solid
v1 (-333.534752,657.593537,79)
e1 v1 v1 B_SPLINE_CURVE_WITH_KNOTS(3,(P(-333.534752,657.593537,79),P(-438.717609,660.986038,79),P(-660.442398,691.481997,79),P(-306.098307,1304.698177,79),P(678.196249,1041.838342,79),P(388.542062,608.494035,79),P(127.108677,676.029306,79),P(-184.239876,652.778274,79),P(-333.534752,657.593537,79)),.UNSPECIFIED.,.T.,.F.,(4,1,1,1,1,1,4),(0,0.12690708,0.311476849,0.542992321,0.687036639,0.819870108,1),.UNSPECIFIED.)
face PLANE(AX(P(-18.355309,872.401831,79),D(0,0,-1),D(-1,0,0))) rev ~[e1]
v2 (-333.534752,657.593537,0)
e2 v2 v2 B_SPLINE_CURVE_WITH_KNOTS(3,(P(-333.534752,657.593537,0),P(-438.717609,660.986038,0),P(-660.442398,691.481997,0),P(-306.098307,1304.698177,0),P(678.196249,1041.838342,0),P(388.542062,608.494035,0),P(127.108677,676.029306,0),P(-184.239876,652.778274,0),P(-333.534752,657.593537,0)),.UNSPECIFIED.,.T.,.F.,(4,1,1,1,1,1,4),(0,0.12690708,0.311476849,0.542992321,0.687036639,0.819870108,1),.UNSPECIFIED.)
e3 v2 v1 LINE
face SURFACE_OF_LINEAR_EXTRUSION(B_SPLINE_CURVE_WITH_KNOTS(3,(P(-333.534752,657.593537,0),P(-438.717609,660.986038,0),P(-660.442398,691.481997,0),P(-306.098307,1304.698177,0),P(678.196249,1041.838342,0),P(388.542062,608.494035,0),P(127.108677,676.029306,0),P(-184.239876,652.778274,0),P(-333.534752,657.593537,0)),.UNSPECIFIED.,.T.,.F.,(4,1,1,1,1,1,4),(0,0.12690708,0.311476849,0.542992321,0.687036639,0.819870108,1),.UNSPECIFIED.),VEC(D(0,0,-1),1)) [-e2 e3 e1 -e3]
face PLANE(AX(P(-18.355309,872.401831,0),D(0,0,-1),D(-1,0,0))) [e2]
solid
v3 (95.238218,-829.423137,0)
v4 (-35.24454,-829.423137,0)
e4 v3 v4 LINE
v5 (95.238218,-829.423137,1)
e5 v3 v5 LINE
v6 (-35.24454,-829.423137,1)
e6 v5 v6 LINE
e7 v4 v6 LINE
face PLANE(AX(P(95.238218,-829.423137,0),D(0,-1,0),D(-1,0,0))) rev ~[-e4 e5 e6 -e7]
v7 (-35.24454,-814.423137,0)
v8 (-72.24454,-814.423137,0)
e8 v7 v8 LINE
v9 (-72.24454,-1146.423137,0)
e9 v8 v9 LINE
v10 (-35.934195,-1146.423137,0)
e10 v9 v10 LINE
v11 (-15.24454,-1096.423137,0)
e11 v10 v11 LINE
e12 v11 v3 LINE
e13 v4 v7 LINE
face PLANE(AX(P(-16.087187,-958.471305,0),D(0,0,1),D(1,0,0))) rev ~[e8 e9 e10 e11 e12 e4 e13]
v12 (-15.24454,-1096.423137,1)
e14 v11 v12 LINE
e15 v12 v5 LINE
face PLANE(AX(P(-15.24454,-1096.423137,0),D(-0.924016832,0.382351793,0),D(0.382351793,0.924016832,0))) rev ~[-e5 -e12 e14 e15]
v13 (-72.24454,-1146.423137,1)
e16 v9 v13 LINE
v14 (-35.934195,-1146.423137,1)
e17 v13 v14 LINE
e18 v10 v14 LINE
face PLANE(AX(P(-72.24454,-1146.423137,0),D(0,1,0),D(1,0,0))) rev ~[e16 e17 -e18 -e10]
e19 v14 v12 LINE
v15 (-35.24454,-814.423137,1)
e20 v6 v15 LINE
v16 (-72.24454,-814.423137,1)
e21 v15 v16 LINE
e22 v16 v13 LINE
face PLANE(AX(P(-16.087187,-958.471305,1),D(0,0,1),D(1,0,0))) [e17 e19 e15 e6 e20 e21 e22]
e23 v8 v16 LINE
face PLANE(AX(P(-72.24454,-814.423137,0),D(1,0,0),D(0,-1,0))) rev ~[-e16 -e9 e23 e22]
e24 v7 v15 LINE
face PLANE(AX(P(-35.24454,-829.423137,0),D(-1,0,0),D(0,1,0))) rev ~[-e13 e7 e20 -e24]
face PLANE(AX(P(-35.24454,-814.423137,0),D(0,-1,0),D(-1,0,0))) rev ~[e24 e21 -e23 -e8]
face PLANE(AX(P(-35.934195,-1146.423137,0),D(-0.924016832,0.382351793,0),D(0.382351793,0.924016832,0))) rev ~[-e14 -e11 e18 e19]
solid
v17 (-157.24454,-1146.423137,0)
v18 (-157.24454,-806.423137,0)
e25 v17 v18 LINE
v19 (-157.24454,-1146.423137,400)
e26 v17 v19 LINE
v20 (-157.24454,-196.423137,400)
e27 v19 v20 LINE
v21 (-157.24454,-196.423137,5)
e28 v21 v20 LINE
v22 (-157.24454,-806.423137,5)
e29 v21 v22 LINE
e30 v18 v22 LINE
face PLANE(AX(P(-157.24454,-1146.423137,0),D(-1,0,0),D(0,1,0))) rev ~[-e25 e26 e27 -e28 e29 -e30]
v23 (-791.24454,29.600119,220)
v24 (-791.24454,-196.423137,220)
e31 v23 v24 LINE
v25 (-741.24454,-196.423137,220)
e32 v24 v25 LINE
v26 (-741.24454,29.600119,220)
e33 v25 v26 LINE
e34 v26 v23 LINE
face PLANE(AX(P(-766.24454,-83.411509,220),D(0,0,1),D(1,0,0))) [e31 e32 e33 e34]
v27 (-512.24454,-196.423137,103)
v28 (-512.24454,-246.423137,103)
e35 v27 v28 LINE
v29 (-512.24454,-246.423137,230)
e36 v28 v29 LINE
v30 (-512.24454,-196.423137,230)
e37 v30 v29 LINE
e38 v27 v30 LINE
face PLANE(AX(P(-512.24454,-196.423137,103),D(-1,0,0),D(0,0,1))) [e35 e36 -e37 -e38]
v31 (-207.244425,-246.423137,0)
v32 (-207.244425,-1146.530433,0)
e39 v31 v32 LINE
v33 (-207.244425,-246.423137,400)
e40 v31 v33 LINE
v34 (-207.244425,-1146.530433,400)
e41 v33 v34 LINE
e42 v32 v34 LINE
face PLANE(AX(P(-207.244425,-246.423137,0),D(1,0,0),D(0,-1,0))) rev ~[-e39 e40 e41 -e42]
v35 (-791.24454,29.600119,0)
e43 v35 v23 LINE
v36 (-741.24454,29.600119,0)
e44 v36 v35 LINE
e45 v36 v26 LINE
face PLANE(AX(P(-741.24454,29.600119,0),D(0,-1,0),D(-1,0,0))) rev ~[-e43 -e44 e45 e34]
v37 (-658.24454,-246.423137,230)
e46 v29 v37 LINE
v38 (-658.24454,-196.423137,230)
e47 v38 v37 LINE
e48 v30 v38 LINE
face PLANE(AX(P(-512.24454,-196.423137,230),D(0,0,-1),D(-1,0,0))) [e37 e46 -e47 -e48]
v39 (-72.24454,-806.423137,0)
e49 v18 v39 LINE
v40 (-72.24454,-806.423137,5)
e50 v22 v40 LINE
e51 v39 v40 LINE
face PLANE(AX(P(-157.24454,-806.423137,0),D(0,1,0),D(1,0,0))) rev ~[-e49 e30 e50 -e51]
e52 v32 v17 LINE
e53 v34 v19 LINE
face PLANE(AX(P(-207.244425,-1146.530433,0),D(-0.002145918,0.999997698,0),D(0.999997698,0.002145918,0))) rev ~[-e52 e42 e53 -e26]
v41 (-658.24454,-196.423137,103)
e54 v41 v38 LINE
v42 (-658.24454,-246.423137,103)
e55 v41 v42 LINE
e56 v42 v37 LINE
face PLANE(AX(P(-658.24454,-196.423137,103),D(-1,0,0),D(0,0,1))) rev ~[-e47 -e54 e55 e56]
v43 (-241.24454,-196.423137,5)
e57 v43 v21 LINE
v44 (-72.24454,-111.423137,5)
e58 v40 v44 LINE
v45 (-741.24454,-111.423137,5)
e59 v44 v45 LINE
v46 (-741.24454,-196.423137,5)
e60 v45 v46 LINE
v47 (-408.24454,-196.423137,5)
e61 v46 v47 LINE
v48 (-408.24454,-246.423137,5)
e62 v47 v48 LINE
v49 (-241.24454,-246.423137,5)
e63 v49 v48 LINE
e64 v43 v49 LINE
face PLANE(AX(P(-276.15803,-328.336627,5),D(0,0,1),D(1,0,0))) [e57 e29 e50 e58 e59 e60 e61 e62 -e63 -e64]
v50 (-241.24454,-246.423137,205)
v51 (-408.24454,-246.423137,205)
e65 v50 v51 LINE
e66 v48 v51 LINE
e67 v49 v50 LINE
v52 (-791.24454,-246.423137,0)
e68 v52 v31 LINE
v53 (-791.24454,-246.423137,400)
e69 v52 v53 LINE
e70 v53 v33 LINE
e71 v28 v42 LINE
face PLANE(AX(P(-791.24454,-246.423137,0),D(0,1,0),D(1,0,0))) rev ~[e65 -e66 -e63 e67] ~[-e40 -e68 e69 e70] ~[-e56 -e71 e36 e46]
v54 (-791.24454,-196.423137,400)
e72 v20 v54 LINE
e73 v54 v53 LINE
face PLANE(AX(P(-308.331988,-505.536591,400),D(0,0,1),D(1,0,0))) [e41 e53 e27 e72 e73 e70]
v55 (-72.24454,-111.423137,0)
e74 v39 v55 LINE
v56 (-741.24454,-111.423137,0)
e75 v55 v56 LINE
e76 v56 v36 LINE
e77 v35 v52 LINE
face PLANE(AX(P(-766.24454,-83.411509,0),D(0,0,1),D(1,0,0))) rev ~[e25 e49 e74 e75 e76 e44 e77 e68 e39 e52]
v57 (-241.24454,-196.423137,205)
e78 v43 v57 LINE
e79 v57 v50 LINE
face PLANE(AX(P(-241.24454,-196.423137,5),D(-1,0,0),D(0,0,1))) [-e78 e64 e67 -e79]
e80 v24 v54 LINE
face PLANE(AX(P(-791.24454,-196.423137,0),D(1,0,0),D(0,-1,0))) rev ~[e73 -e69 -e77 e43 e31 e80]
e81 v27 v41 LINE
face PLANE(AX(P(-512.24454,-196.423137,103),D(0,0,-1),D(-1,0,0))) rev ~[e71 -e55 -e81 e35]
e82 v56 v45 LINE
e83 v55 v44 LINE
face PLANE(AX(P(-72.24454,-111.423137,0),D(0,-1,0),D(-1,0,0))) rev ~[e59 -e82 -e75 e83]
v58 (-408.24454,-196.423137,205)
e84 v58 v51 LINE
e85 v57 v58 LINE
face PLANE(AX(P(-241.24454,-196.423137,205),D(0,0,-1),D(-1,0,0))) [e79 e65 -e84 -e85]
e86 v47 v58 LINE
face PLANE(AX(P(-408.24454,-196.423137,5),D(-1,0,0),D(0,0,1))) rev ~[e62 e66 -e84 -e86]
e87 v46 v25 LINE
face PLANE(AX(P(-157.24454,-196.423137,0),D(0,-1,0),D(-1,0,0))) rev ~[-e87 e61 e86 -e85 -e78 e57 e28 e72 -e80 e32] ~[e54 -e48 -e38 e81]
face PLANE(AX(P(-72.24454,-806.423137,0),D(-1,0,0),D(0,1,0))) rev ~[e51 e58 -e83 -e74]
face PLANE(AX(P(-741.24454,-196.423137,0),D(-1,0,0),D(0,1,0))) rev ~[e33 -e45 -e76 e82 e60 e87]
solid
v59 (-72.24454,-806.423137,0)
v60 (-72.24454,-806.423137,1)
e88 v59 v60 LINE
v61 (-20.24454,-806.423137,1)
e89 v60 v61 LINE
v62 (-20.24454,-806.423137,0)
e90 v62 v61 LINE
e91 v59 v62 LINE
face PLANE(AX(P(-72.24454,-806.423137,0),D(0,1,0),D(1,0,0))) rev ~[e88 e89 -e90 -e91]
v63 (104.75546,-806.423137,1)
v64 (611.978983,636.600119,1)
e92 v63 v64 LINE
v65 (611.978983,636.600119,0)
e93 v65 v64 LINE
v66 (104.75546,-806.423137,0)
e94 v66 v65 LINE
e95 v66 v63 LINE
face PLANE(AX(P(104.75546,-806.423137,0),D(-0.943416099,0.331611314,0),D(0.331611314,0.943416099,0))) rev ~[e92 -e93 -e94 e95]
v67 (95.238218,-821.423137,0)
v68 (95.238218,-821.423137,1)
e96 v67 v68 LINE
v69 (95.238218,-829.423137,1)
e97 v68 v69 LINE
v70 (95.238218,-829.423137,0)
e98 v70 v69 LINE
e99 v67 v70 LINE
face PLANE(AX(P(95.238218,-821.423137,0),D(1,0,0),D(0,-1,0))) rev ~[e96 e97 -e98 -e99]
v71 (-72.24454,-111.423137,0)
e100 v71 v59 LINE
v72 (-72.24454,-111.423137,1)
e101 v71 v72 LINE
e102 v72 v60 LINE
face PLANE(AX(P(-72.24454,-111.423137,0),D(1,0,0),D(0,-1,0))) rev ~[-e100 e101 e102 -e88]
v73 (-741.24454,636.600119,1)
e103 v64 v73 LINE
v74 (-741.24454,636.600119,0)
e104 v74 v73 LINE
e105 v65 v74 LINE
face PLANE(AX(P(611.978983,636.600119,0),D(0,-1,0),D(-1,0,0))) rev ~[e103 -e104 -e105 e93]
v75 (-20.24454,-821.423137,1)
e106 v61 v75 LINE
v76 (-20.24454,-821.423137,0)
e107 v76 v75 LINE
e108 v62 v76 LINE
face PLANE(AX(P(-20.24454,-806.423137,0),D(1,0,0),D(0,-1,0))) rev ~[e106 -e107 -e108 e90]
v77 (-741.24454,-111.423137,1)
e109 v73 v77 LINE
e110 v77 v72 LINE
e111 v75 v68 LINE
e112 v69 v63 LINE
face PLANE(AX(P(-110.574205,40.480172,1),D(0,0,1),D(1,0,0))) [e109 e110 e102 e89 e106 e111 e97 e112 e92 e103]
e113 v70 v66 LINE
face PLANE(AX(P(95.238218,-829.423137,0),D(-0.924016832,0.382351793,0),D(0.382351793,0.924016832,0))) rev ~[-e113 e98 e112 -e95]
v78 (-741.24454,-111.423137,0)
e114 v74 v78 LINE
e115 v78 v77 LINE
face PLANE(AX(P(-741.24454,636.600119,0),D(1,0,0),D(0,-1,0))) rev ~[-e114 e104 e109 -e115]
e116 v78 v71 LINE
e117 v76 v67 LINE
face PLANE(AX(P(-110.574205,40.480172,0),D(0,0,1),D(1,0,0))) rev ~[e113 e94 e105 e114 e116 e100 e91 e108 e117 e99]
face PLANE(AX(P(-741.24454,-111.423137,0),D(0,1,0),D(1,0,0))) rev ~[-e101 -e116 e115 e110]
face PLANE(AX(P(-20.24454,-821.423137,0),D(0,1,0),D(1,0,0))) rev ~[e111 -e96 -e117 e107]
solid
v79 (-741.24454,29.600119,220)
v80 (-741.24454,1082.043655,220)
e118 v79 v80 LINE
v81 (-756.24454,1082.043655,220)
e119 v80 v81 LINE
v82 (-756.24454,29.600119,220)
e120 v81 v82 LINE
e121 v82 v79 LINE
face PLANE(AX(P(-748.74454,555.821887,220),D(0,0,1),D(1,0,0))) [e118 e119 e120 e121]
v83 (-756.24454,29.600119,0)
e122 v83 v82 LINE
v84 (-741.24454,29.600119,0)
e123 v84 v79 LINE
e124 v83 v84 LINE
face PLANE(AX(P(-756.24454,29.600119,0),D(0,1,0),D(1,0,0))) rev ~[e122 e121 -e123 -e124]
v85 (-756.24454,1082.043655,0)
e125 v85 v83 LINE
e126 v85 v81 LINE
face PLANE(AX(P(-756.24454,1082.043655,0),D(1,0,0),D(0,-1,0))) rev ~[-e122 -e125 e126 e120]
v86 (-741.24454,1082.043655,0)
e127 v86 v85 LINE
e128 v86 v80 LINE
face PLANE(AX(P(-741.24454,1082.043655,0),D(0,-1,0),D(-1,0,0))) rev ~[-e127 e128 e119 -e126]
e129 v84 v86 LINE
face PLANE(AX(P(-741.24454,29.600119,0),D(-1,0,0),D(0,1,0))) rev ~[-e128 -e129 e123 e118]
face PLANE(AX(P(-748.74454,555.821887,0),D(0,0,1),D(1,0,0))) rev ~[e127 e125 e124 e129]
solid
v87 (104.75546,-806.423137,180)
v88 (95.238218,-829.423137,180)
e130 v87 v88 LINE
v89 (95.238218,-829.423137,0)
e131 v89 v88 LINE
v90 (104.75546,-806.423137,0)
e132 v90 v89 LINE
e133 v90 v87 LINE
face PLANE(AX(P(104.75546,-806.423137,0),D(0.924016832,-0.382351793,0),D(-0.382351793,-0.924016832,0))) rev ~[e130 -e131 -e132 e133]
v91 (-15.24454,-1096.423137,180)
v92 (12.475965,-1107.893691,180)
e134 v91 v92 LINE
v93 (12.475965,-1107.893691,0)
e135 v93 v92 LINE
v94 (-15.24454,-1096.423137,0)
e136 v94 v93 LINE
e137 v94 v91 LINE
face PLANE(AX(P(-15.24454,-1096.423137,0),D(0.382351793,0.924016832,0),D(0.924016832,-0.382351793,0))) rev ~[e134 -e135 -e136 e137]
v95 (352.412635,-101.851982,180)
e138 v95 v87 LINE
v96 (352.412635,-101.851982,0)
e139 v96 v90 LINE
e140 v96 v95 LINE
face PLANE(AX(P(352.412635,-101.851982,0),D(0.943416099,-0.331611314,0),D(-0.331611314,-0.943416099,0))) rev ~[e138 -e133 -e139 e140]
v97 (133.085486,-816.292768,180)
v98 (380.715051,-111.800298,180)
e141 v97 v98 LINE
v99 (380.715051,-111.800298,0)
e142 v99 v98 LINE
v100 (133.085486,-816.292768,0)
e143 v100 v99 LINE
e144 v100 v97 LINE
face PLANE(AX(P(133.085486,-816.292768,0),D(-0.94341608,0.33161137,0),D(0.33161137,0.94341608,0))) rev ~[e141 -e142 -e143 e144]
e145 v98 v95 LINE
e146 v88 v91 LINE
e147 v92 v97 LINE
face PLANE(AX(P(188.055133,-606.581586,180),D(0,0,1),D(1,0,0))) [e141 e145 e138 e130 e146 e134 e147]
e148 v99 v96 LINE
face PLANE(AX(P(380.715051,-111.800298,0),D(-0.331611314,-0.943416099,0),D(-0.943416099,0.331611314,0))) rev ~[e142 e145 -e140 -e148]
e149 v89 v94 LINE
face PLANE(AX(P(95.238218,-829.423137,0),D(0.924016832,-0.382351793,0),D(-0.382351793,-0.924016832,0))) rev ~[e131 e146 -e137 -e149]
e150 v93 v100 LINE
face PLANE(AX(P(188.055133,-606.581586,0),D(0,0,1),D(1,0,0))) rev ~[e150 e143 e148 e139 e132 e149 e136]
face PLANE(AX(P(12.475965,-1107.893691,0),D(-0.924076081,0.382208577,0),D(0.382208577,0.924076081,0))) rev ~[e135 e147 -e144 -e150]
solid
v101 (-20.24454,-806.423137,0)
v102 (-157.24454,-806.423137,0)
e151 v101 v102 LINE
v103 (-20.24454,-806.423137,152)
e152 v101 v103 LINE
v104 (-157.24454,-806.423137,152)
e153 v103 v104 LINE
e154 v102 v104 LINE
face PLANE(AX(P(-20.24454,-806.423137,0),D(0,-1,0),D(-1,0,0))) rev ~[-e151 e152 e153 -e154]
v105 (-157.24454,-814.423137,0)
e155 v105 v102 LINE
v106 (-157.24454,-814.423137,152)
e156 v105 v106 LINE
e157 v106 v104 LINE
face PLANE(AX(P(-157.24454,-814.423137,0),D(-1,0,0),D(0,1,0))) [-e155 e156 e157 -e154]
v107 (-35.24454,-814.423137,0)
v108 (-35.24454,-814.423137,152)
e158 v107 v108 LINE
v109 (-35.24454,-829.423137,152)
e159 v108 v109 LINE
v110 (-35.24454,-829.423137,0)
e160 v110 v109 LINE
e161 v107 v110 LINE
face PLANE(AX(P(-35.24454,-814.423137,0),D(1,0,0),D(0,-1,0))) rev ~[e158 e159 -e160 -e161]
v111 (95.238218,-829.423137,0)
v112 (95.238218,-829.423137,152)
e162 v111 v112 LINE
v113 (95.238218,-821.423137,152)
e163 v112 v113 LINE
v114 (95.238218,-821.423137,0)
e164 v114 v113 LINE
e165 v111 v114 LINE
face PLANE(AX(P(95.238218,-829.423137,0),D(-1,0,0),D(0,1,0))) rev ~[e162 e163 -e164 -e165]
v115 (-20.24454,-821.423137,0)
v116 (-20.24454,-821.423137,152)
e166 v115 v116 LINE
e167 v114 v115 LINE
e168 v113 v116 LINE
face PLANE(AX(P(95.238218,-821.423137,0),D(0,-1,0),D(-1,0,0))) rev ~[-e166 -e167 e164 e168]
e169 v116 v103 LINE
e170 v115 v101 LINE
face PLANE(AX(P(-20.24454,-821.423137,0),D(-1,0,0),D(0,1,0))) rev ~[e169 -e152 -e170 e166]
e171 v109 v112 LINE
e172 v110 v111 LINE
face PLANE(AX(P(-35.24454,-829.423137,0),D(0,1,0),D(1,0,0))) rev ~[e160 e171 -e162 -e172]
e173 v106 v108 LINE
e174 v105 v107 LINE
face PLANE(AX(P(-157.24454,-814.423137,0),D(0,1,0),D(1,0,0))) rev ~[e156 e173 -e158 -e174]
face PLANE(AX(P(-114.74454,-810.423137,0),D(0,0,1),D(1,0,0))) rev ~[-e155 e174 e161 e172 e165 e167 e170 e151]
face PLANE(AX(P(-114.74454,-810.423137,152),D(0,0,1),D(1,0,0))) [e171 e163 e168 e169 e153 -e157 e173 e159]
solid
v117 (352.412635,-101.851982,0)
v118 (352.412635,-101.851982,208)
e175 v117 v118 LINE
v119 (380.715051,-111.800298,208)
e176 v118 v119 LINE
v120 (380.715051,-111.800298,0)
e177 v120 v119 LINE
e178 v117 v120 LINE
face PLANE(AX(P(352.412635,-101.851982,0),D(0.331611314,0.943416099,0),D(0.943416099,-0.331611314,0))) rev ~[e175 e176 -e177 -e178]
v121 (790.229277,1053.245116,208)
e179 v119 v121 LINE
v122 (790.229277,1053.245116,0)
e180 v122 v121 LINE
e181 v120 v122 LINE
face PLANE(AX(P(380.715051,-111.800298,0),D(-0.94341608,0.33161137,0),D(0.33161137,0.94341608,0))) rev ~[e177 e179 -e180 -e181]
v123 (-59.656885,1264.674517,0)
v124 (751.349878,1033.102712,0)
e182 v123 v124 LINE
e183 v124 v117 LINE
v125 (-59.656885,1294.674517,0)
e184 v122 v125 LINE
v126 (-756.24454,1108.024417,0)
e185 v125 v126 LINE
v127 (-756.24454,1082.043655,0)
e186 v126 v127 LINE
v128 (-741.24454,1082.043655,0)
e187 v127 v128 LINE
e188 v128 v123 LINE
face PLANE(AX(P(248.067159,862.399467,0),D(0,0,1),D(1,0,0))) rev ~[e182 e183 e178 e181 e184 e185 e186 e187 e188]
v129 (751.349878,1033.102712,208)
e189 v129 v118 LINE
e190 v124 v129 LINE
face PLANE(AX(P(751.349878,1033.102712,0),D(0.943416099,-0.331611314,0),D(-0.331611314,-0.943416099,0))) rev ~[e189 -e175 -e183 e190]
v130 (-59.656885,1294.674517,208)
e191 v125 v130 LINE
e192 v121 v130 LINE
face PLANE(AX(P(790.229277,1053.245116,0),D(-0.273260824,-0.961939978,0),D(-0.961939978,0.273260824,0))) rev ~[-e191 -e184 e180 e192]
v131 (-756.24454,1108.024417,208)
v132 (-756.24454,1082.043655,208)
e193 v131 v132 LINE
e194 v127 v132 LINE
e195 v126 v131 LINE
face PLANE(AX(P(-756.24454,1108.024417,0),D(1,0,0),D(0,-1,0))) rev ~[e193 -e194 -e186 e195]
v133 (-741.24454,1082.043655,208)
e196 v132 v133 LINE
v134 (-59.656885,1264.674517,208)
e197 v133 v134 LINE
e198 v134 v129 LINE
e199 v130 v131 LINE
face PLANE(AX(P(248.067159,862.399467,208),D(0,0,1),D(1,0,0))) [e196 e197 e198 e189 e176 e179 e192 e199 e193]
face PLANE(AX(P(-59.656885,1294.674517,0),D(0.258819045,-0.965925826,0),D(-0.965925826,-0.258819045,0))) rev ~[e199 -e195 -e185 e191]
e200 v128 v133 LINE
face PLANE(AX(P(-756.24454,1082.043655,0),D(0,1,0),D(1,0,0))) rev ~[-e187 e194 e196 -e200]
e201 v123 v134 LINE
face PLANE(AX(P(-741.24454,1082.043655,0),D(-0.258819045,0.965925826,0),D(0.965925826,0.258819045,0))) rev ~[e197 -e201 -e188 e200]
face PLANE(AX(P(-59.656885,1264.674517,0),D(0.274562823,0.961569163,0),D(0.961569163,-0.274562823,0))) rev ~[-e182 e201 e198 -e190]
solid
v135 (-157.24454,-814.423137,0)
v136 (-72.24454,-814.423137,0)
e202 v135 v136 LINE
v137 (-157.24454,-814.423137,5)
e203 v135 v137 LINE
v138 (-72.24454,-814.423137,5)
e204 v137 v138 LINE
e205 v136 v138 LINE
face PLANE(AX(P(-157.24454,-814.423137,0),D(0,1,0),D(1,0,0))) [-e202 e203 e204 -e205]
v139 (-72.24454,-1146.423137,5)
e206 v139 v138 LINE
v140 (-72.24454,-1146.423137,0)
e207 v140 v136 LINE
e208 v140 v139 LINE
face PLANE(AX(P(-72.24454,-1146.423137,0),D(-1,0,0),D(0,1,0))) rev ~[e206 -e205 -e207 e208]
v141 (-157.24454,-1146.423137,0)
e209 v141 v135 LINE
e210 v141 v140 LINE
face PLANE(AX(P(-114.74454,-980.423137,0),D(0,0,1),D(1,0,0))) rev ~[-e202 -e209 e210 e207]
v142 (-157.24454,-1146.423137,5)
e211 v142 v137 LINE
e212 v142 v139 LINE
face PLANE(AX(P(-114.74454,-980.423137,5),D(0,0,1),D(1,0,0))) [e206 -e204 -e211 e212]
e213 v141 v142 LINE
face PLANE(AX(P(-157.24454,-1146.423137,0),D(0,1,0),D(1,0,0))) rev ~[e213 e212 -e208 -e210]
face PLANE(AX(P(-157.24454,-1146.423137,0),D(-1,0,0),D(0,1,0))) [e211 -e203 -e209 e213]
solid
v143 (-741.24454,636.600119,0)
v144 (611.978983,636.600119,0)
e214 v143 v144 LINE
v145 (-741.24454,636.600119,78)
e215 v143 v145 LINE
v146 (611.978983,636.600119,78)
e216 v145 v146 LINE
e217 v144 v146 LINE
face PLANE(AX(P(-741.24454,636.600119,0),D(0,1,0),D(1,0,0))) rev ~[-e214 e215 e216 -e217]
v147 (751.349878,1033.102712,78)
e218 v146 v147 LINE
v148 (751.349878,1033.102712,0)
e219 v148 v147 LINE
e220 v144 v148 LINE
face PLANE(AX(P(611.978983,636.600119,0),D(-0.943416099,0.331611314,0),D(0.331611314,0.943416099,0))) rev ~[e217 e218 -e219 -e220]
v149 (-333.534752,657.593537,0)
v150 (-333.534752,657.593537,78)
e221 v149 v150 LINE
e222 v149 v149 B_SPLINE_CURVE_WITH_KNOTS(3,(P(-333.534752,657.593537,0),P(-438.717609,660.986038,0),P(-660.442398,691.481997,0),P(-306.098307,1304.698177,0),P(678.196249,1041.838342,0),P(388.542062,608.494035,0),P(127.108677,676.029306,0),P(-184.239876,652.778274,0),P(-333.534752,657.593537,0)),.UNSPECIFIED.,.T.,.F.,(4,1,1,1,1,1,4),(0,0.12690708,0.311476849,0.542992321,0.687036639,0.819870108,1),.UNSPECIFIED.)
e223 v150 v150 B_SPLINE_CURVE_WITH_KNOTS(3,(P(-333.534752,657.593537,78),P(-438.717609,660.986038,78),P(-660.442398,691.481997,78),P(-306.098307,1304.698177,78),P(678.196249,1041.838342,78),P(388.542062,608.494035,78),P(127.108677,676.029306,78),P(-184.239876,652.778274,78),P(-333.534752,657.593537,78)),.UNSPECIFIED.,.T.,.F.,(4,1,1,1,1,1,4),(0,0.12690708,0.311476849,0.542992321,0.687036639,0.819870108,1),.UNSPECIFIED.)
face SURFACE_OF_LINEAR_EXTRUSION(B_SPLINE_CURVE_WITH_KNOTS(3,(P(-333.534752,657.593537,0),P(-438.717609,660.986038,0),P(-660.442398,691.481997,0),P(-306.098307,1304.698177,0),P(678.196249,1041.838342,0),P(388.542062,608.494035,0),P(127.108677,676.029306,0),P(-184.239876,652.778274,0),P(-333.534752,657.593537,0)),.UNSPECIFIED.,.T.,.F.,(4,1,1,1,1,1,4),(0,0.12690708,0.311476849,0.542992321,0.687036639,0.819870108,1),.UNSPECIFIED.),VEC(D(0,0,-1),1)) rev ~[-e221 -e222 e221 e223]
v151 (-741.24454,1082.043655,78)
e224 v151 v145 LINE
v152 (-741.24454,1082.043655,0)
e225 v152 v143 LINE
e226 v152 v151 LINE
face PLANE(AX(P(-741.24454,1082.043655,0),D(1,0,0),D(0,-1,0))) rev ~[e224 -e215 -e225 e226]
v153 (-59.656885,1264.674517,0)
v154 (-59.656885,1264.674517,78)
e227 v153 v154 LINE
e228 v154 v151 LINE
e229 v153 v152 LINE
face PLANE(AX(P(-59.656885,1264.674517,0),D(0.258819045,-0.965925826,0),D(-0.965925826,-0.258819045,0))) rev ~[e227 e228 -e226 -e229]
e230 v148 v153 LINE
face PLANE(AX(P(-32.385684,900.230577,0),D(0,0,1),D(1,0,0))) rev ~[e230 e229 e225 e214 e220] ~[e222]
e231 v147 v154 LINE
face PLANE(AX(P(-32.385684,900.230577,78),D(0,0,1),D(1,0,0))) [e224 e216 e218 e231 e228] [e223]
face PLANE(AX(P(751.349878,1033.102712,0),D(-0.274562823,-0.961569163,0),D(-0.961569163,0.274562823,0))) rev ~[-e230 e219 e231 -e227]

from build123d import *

# Parameters (mm, degrees)
F1_DEPTH  = 78
F2_DEPTH  = 5
F0_W      = 85
F0_H      = 332
F3_DEPTH  = 220
F4_DEPTH  = 220
F5_DEPTH  = 400
F6_W      = 167
F6_H      = 200
F6_W_2    = 146
F6_H_2    = 127
F7_DEPTH  = 200
F8_DEPTH  = 208
F9_DEPTH  = 180
F0_H_2    = 8
F0_W_2    = 37
F10_DEPTH = 152
F11_DEPTH = 79
F12_DEPTH = 1
F13_DEPTH = 1


# Not quite as in the source:
# - a feature names something its author has since deleted; it is built from what else it names


with BuildPart() as f1:
    # F0 (on Top) → F1 (new body)
    with BuildSketch(Plane.XY):
        Polygon((-741.2445402145, 1082.0436550353), (-741.2445402145, 636.6001187265), (85.7554597855, 636.6001187265), (611.9789830182, 636.6001187265), (751.3498777895, 1033.1027120147), (-59.6568852941, 1264.6745167422), align=None)
        with BuildLine():
            add(Edge.make_bspline(
                [(-333.5347517591, 657.5935368718), (-438.7176092773, 660.9860382691), (-660.4423976157, 691.4819966509), (-306.0983067038, 1304.6981771282), (678.1962489209, 1041.8383423681), (388.5420616008, 608.4940348272), (127.1086766673, 676.0293060865), (-184.2398763148, 652.7782743329), (-333.5347517591, 657.5935368718)],
                knots=[0, 0, 0, 0, 0.1269070803, 0.3114768491, 0.5429923215, 0.687036639, 0.8198701082, 1, 1, 1, 1], degree=3))
        make_face(mode=Mode.SUBTRACT)
    extrude(amount=F1_DEPTH)


with BuildPart() as f2:
    # F0 (on Top) → F2 (new body)
    with BuildSketch(Plane.XY):
        Polygon((-157.2445402145, -196.4231370871), (-157.2445402145, -333.8946764966), (-157.2445402145, -806.4231370871), (-72.2445402145, -806.4231370871), (-72.2445402145, -360.4946641021), (-72.2445402145, -111.4231370871), (-741.2445402145, -111.4231370871), (-741.2445402145, -196.4231370871), align=None)
    extrude(amount=F2_DEPTH)

    # F0 (on Top) → F3 (join)
    with BuildSketch(Plane.XY):
        Polygon((-791.2445402145, -196.4231370871), (-741.2445402145, -196.4231370871), (-741.2445402145, -111.4231370871), (-741.2445402145, 29.6001187267), (-756.2445402145, 29.6001187267), (-791.2445402145, 29.6001187267), align=None)
    extrude(amount=F3_DEPTH)

    # F0 (on Top) → F5 (join)
    with BuildSketch(Plane.XY):
        Polygon((-157.2445402145, -806.4231370871), (-157.2445402145, -333.8946764966), (-157.2445402145, -196.4231370871), (-741.2445402145, -196.4231370871), (-791.2445402145, -196.4231370871), (-791.2445402145, -246.4231370871), (-207.2444250903, -246.4231370871), (-207.2444250903, -1146.5304329774), (-157.2445402145, -1146.4231370871), (-157.2445402145, -814.4231370871), align=None)
    extrude(amount=F5_DEPTH)

    # F6 (on face) → F7 (cut)
    with BuildSketch(Plane(origin=(0, -196.4231370871, 0), x_dir=(-1, 0, 0), z_dir=(0, 1, 0))):
        with Locations((324.7445402145, 105)):
            Rectangle(F6_W, F6_H)
        with Locations((585.2445402145, 166.5)):
            Rectangle(F6_W_2, F6_H_2)
    extrude(amount=-F7_DEPTH, mode=Mode.SUBTRACT)


with BuildPart() as f2b:
    # F0 (on Top) → F2, piece 2 (new body)
    with BuildSketch(Plane.XY):
        with Locations((-114.7445402145, -980.4231370871)):
            Rectangle(F0_W, F0_H)
    extrude(amount=F2_DEPTH)


with BuildPart() as f4:
    # F0 (on Top) → F4 (new body)
    with BuildSketch(Plane.XY):
        Polygon((-756.2445402145, 29.6001187267), (-741.2445402145, 29.6001187267), (-741.2445402145, 636.6001187265), (-741.2445402145, 1082.0436550353), (-756.2445402145, 1082.0436550353), align=None)
    extrude(amount=F4_DEPTH)


with BuildPart() as f8:
    # F0 (on Top) → F8 (new body)
    with BuildSketch(Plane.XY):
        Polygon((-756.2445402145, 1082.0436550353), (-741.2445402145, 1082.0436550353), (-59.6568852941, 1264.6745167422), (751.3498777895, 1033.1027120147), (611.9789830182, 636.6001187265), (536.7554597855, 422.5932983858), (352.412635156, -101.8519822417), (380.7150506744, -111.8002979444), (790.2292767004, 1053.2451157589), (-59.6568852941, 1294.6745167422), (-756.2445402145, 1108.0244171488), align=None)
    extrude(amount=F8_DEPTH)


with BuildPart() as f9:
    # F0 (on Top) → F9 (new body)
    with BuildSketch(Plane.XY):
        Polygon((95.2382184061, -829.4231370871), (-15.2445402145, -1096.4231370871), (12.4759647581, -1107.8936908689), (133.0854861388, -816.292767618), (380.7150506744, -111.8002979444), (352.412635156, -101.8519822417), (104.7554597855, -806.4231370871), align=None)
    extrude(amount=F9_DEPTH)


with BuildPart() as f10:
    # F0 (on Top) → F10 (new body)
    with BuildSketch(Plane.XY):
        with Locations((-114.7445402145, -810.4231370871)):
            Rectangle(F0_W, F0_H_2)
        with Locations((-53.7445402145, -810.4231370871)):
            Rectangle(F0_W_2, F0_H_2)
        Polygon((-20.2445402145, -821.4231370871), (-35.2445402145, -821.4231370871), (-35.2445402145, -829.4231370871), (95.2382184061, -829.4231370871), (95.2382184061, -821.4231370871), align=None)
        Polygon((-20.2445402145, -806.4231370871), (-35.2445402145, -806.4231370871), (-35.2445402145, -814.4231370871), (-35.2445402145, -821.4231370871), (-20.2445402145, -821.4231370871), align=None)
    extrude(amount=F10_DEPTH)


with BuildPart() as f11:
    # F0 (on Top) → F11 (new body)
    with BuildSketch(Plane.XY):
        with BuildLine():
            add(Edge.make_bspline(
                [(-333.5347517591, 657.5935368718), (-438.7176092773, 660.9860382691), (-660.4423976157, 691.4819966509), (-306.0983067038, 1304.6981771282), (678.1962489209, 1041.8383423681), (388.5420616008, 608.4940348272), (127.1086766673, 676.0293060865), (-184.2398763148, 652.7782743329), (-333.5347517591, 657.5935368718)],
                knots=[0, 0, 0, 0, 0.1269070803, 0.3114768491, 0.5429923215, 0.687036639, 0.8198701082, 1, 1, 1, 1], degree=3))
        make_face()
    extrude(amount=F11_DEPTH)


with BuildPart() as f12:
    # F0 (on Top) → F12 (new body)
    with BuildSketch(Plane.XY):
        Polygon((-72.2445402145, -360.4946641021), (-72.2445402145, -806.4231370871), (-35.2445402145, -806.4231370871), (-20.2445402145, -806.4231370871), (-20.2445402145, -821.4231370871), (95.2382184061, -821.4231370871), (95.2382184061, -829.4231370871), (104.7554597855, -806.4231370871), (352.412635156, -101.8519822417), (536.7554597855, 422.5932983858), (430.7554597855, 422.5932983858), (310.7554597855, 422.5932983858), (85.7554597855, 422.5932983858), (85.7554597855, 636.6001187265), (-741.2445402145, 636.6001187265), (-741.2445402145, 29.6001187267), (-741.2445402145, -111.4231370871), (-72.2445402145, -111.4231370871), align=None)
        Polygon((611.9789830182, 636.6001187265), (85.7554597855, 636.6001187265), (85.7554597855, 422.5932983858), (310.7554597855, 422.5932983858), (430.7554597855, 422.5932983858), (536.7554597855, 422.5932983858), align=None)
    extrude(amount=F12_DEPTH)


with BuildPart() as f13:
    # F0 (on Top) → F13 (new body)
    with BuildSketch(Plane.XY):
        Polygon((-35.2445402145, -814.4231370871), (-72.2445402145, -814.4231370871), (-72.2445402145, -1146.4231370871), (-35.934195387, -1146.4231370871), (-15.2445402145, -1096.4231370871), (95.2382184061, -829.4231370871), (-35.2445402145, -829.4231370871), (-35.2445402145, -821.4231370871), align=None)
    extrude(amount=F13_DEPTH)


solid = Compound([f1.part, f2.part, f2b.part, f4.part, f8.part, f9.part, f10.part, f11.part, f12.part, f13.part])
